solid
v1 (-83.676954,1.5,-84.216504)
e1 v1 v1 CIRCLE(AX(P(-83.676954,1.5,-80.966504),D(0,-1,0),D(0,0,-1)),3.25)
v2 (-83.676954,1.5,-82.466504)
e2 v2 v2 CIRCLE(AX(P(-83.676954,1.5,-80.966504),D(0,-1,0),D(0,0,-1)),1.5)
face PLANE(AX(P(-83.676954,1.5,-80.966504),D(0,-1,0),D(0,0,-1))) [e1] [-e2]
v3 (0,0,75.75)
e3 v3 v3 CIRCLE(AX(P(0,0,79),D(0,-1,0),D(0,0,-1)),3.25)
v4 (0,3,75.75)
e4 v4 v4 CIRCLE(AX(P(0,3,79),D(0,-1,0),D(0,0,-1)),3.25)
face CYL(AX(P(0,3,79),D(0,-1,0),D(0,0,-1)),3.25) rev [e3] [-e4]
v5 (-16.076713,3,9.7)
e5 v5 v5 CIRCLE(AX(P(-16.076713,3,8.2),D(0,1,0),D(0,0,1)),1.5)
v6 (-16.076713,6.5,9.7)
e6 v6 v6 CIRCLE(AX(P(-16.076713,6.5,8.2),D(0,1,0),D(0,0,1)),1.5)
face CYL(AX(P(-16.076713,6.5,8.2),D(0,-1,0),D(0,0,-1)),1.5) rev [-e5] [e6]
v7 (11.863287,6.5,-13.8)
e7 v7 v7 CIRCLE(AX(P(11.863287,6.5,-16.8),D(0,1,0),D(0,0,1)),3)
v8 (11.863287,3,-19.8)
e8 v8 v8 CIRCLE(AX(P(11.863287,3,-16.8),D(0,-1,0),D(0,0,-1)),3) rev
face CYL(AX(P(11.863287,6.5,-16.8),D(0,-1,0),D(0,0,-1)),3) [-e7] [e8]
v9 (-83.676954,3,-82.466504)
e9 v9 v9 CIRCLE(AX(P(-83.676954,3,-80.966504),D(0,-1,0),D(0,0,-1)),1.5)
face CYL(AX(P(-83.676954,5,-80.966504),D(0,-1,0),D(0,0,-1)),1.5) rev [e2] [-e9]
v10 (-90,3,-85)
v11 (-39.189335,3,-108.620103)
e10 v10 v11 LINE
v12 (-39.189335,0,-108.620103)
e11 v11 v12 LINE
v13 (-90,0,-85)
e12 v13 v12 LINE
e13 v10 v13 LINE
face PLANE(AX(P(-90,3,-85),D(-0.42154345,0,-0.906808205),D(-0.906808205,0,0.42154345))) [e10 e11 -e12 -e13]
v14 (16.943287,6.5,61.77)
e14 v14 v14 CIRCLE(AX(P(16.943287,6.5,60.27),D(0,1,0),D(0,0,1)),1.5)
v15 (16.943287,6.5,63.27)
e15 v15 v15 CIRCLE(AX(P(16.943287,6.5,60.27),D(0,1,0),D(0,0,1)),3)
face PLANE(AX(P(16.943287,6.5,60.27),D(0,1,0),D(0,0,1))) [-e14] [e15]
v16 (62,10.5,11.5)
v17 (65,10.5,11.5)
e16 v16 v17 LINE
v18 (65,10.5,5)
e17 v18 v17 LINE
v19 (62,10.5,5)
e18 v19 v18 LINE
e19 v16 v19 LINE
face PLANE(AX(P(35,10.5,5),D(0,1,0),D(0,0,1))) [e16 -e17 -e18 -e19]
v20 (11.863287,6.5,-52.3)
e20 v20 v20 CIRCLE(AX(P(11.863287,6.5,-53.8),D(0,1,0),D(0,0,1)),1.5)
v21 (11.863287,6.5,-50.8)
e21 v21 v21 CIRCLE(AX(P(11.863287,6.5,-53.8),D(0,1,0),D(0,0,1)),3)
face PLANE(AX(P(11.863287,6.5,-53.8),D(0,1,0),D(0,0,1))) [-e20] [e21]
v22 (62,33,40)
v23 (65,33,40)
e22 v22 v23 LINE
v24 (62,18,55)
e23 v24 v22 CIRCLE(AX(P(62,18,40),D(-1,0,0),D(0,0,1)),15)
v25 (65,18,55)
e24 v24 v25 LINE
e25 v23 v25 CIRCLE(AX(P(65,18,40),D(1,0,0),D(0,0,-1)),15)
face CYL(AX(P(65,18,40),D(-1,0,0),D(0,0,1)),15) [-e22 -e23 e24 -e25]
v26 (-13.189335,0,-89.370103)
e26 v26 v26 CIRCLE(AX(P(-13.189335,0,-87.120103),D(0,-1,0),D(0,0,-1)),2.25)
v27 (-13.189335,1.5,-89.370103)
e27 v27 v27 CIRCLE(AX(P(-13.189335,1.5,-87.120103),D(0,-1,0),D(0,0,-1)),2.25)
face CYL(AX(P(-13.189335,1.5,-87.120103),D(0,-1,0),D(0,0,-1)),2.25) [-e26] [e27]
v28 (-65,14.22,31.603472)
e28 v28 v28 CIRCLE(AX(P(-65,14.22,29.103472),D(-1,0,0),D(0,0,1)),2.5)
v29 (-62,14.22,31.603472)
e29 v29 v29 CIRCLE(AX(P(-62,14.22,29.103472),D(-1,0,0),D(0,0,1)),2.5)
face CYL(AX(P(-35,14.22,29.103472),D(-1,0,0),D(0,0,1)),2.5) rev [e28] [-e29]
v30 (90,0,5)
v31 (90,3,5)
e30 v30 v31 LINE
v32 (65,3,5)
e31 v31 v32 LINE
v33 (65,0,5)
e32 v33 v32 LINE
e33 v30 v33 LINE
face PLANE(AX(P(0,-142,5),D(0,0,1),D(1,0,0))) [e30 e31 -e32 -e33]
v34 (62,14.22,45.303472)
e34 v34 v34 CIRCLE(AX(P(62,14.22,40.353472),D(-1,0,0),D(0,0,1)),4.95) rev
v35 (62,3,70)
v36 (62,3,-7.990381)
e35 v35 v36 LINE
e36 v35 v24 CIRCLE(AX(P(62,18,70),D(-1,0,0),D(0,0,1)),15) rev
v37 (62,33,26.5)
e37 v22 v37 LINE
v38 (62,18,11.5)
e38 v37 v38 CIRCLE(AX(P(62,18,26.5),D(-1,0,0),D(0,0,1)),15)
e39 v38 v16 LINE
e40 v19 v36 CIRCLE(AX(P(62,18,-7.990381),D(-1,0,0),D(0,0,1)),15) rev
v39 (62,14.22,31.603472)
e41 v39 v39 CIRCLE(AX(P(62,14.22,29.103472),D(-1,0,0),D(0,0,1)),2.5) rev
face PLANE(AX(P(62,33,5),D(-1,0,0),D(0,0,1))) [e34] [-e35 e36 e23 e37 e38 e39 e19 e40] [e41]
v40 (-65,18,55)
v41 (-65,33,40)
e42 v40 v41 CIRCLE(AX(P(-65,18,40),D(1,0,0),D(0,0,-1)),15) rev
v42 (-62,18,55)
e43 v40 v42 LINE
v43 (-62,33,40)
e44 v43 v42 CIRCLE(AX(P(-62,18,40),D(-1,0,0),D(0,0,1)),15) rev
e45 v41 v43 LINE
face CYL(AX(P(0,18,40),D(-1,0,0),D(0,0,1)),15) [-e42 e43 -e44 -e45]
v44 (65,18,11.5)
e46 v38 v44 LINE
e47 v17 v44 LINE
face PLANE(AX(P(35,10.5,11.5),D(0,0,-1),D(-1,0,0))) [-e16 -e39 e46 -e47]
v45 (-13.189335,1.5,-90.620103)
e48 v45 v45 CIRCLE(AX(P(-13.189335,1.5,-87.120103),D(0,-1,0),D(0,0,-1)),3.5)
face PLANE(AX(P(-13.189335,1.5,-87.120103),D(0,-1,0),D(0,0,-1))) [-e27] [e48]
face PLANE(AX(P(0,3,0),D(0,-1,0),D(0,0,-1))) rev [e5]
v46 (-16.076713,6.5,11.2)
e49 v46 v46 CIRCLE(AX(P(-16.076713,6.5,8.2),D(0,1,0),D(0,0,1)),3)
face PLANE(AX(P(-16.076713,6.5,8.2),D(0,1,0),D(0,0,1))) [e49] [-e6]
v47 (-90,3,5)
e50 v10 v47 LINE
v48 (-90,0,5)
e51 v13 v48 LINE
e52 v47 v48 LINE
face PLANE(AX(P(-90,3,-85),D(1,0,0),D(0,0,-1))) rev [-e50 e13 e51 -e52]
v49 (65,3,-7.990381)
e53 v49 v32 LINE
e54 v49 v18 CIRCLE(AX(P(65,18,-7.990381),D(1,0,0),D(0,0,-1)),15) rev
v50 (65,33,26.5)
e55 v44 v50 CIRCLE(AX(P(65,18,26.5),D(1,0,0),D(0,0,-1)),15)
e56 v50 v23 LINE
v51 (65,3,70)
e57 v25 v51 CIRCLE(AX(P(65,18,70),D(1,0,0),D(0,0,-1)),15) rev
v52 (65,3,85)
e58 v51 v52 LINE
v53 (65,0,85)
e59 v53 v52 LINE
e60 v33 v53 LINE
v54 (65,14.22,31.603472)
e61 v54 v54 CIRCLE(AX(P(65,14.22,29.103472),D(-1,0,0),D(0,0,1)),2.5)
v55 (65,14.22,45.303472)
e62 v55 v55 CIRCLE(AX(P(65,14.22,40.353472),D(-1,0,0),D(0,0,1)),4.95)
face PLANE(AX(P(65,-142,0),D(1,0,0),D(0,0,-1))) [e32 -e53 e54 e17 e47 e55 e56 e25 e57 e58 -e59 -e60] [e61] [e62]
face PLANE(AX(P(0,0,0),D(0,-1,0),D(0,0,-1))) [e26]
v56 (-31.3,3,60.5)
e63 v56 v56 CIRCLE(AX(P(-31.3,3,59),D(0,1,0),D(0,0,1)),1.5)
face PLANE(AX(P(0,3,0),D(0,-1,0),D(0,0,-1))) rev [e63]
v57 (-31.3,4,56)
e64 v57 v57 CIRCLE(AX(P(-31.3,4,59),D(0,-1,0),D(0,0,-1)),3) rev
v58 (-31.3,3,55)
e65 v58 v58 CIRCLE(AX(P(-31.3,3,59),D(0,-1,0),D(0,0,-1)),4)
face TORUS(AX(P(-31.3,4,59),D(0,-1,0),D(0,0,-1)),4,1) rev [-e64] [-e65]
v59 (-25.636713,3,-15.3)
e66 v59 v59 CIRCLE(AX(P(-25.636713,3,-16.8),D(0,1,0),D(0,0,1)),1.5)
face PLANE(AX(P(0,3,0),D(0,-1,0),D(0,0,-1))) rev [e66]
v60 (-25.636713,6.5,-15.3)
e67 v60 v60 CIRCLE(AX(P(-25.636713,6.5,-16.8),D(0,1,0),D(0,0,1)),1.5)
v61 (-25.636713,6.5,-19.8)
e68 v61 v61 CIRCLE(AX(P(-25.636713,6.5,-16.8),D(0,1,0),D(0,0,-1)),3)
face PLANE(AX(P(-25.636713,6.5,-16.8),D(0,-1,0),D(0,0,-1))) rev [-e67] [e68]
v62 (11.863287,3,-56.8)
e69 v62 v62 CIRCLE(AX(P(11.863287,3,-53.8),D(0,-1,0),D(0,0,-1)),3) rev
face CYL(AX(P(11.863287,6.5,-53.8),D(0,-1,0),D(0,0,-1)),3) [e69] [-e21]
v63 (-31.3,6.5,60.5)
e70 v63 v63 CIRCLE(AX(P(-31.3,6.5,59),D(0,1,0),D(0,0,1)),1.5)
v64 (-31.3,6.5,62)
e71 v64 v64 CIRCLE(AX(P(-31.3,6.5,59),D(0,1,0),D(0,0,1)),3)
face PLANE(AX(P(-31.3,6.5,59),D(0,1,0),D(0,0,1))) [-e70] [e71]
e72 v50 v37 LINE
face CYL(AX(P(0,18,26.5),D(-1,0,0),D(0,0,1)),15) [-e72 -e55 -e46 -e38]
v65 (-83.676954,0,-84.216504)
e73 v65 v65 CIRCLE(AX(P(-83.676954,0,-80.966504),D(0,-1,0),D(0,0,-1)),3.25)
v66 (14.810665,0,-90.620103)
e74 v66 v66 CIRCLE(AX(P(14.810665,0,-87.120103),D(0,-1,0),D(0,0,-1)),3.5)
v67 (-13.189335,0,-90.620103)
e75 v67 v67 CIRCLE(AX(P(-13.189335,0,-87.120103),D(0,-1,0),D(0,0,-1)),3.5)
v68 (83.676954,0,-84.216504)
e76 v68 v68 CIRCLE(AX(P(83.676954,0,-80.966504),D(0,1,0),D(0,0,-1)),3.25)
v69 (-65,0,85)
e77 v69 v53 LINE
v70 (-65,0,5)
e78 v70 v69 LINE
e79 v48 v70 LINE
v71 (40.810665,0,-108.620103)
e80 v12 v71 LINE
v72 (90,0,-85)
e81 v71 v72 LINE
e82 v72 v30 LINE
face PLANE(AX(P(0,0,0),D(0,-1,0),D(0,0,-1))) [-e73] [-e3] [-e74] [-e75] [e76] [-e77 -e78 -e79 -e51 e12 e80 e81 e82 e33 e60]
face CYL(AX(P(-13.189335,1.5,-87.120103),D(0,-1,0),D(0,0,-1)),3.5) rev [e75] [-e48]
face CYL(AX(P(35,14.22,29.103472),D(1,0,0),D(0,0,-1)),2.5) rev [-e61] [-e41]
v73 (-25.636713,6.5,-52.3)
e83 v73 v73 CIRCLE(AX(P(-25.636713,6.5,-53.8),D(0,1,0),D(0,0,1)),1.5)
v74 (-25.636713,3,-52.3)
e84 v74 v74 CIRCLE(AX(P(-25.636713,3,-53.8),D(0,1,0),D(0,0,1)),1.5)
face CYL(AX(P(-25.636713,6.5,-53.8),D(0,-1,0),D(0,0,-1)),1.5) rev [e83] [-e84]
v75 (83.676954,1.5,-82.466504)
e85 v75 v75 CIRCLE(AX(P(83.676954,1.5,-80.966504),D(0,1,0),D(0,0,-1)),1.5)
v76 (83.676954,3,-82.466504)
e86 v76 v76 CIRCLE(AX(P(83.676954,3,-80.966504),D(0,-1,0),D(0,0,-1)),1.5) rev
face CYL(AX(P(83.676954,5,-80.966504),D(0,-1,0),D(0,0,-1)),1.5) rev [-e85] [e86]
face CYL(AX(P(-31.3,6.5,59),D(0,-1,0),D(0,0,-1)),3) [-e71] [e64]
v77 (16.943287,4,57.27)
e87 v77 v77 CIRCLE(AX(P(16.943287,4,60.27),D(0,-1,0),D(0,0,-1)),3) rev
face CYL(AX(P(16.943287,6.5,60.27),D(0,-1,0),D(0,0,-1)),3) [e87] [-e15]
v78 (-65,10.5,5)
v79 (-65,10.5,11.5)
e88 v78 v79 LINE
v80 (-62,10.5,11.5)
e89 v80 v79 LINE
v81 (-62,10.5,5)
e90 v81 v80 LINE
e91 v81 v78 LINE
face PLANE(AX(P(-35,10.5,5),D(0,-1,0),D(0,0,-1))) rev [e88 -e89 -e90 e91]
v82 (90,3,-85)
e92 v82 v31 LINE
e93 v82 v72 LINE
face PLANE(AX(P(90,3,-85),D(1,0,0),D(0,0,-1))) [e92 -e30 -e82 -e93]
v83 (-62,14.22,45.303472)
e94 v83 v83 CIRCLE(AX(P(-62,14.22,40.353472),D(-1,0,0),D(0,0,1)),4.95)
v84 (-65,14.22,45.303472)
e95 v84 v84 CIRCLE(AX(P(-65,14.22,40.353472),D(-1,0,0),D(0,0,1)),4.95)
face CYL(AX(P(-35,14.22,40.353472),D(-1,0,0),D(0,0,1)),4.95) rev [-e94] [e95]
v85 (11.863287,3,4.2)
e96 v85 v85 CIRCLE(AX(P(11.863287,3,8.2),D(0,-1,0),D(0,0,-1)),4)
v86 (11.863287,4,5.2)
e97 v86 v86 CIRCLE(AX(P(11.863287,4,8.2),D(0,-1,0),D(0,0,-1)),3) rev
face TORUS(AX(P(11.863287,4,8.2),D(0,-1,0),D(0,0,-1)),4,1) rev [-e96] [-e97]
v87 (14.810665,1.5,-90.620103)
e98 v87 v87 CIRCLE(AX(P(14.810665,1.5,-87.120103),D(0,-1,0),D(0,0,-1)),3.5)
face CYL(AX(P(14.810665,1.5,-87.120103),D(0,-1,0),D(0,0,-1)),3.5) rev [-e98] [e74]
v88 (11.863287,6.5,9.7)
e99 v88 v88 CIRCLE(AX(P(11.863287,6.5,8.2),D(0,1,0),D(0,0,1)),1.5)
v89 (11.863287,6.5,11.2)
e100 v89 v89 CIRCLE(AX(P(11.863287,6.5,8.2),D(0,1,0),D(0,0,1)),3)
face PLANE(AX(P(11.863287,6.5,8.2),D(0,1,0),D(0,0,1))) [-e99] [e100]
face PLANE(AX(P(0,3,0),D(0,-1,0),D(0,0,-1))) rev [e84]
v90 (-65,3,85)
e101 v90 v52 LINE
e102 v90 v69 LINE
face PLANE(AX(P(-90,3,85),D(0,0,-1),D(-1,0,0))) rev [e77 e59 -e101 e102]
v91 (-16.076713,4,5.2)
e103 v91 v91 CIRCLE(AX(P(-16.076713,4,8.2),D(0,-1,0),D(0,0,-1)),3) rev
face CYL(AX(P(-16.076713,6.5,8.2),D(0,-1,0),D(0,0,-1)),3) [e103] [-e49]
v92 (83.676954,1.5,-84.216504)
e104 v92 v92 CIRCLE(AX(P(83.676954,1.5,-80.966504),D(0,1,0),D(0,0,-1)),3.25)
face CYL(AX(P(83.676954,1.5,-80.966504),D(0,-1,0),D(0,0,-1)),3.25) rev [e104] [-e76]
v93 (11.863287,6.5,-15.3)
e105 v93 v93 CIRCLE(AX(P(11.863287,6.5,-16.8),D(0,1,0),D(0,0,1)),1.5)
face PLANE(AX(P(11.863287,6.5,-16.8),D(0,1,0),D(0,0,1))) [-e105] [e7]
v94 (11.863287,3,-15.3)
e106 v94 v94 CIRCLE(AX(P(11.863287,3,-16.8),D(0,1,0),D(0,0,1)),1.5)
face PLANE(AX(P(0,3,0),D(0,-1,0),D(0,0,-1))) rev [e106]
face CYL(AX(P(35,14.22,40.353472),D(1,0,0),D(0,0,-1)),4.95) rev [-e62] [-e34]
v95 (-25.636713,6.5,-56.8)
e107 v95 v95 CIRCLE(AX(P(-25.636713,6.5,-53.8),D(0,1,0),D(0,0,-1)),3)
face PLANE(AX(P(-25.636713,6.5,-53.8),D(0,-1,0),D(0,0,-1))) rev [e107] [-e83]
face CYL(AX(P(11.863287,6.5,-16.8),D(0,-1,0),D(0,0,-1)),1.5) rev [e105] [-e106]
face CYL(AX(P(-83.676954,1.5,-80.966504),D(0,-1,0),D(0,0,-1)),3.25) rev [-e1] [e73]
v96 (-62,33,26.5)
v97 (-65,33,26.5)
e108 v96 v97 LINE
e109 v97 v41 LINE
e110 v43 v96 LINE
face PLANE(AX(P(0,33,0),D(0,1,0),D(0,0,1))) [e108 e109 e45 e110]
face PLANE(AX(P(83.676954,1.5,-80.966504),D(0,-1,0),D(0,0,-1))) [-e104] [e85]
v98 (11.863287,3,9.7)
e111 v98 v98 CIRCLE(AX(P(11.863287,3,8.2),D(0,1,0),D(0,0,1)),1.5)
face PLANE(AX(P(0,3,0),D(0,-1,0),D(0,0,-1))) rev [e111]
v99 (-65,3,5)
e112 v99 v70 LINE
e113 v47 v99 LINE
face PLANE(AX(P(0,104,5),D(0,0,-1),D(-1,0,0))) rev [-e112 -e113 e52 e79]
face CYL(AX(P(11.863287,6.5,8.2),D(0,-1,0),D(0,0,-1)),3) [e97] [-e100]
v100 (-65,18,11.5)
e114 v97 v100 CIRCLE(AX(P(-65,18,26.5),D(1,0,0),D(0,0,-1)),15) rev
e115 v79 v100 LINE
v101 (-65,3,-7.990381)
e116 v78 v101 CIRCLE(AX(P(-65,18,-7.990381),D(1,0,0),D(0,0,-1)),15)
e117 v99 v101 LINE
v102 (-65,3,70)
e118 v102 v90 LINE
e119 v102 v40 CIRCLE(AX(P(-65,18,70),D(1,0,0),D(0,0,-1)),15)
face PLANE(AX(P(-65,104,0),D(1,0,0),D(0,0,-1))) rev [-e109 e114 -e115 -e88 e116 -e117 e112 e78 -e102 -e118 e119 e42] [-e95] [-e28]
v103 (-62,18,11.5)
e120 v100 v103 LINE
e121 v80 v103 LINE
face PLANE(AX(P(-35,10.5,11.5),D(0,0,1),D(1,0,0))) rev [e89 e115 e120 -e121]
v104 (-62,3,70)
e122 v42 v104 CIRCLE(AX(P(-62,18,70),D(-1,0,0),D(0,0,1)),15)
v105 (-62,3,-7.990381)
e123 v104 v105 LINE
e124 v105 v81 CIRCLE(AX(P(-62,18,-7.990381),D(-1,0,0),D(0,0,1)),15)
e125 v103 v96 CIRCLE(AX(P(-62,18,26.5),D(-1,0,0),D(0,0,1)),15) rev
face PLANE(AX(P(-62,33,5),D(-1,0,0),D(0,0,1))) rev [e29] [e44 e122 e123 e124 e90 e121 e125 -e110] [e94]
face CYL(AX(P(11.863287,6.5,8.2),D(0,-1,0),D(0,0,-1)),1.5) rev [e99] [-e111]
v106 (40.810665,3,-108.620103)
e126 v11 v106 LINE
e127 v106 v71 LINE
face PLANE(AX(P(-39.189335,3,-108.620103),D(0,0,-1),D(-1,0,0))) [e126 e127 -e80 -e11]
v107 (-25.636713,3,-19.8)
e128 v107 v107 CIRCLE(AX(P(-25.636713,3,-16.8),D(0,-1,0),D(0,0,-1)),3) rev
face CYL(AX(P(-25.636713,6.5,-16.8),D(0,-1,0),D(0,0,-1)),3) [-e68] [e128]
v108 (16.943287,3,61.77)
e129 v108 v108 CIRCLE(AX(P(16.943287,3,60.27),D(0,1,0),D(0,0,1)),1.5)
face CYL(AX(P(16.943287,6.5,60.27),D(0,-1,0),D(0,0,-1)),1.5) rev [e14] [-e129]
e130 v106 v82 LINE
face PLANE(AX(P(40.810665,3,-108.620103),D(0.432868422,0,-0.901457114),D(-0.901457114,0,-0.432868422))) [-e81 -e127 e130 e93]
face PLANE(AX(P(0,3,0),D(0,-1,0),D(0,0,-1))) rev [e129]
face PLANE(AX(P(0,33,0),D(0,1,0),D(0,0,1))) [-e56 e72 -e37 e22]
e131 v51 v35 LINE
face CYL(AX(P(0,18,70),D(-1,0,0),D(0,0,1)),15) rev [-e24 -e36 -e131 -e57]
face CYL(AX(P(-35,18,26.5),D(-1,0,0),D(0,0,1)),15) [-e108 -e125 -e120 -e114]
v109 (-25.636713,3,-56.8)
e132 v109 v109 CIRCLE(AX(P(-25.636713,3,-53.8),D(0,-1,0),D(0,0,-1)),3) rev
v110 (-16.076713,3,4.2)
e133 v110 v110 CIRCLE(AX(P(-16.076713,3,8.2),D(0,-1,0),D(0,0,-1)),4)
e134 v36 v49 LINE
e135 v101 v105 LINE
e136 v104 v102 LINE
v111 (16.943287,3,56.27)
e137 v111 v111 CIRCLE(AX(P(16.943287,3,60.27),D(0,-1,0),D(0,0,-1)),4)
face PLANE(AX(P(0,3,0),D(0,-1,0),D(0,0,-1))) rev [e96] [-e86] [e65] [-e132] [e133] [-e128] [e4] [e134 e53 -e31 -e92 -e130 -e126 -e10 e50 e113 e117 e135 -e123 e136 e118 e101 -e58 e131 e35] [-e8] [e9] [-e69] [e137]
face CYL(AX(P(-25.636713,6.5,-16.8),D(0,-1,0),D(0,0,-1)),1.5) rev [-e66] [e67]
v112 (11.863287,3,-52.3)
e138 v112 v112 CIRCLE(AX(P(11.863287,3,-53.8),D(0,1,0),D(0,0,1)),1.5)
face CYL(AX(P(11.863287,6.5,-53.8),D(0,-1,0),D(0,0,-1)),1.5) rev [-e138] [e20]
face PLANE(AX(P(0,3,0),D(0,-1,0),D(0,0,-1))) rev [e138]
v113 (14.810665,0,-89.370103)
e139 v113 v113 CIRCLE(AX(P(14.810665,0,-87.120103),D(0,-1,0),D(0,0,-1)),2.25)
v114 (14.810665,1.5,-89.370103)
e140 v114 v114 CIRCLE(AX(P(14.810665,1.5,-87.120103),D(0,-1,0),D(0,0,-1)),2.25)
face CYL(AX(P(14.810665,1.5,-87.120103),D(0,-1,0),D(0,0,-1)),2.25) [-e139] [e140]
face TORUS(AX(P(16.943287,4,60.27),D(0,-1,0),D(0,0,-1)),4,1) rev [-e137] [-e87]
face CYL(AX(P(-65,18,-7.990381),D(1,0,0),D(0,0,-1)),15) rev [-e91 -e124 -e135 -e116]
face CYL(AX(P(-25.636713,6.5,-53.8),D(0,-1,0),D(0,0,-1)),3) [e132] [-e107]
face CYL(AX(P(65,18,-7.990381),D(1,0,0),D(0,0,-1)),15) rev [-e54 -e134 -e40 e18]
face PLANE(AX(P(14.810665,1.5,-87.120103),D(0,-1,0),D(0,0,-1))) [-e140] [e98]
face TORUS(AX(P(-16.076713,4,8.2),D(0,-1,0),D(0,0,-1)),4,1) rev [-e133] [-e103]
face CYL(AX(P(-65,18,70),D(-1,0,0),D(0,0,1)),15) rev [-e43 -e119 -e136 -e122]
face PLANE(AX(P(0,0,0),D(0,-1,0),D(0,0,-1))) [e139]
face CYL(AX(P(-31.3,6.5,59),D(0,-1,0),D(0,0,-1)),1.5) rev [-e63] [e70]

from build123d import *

# Parameters (mm, degrees)
SALIENTE_EXTRUIR1_DEPTH    = 3
CORTAR_EXTRUIR5_DEPTH      = 104
CORTAR_EXTRUIR5_DEPTH_BACK = 142
CROQUIS1_5_W               = 25
CROQUIS1_5_H               = 80
CROQUIS2_W                 = 3
CROQUIS2_H                 = 50
SALIENTE_EXTRUIR2_DEPTH    = 30
CROQUIS3_R                 = 4.95
CROQUIS3_R_2               = 2.5
CROQUIS3_W                 = 6.5
CROQUIS3_H                 = 22.5
CORTAR_EXTRUIR6_DEPTH      = 30
CROQUIS4_R                 = 3.25
CORTAR_EXTRUIR7_DEPTH      = 1.5
CROQUIS5_R                 = 3.25
CORTAR_EXTRUIR8_DEPTH      = 3
REDONDEO11_R               = 15
REDONDEO12_START           = -65
REDONDEO12_DEPTH           = 130
REDONDEO12_2_DEPTH         = 3
REDONDEO12_START_2         = 62
REDONDEO12_3_DEPTH         = 3
REDONDEO13_R               = 15
CROQUIS7_R                 = 3
CROQUIS7_R_2               = 1.5
SALIENTE_EXTRUIR4_DEPTH    = 3.5
REDONDEO14_R               = 1
CROQUIS10_R                = 1.5
CORTAR_EXTRUIR11_DEPTH     = 3.5
CROQUIS6_R                 = 3.5
CROQUIS6_R_2               = 2.25
CORTAR_EXTRUIR12_DEPTH     = 1.5


with BuildPart() as part:
    # Croquis1 → Saliente-Extruir1 (new body)
    with BuildSketch(Plane(origin=(0, 0, 0), x_dir=(1, 0, 0), z_dir=(0, 1, 0))):
        Polygon((-90, 85), (-90, -85), (90, -85), (90, 85), (40.810665128, 108.620102865), (-39.189334872, 108.620102865), align=None)
    extrude(amount=SALIENTE_EXTRUIR1_DEPTH)

    # Croquis1<5> → Cortar-Extruir5 (cut, two sides: drawn at the far end of the back side and taken through both)
    with BuildSketch(Plane(origin=(0, 0, 0), x_dir=(1, 0, 0), z_dir=(0, 1, 0)).offset(-CORTAR_EXTRUIR5_DEPTH_BACK)):
        with Locations((-77.5, -45)):
            Rectangle(CROQUIS1_5_W, CROQUIS1_5_H)
        with Locations((77.5, -45)):
            Rectangle(CROQUIS1_5_W, CROQUIS1_5_H)
    extrude(amount=CORTAR_EXTRUIR5_DEPTH + CORTAR_EXTRUIR5_DEPTH_BACK, mode=Mode.SUBTRACT)

    # Croquis2 → Saliente-Extruir2 (add)
    with BuildSketch(Plane(origin=(0, 3, 0), x_dir=(1, 0, 0), z_dir=(0, 1, 0))):
        with Locations((-63.5, -30)):
            Rectangle(CROQUIS2_W, CROQUIS2_H)
    saliente_extruir2 = extrude(amount=SALIENTE_EXTRUIR2_DEPTH)

    # Croquis3 → Cortar-Extruir6 (cut)
    with BuildSketch(Plane.ZY.offset(65)):
        with Locations((40.353471705, 14.22)):
            Circle(CROQUIS3_R)
        with Locations((29.103471705, 14.22)):
            Circle(CROQUIS3_R_2)
        with Locations((8.25, 21.75)):
            Rectangle(CROQUIS3_W, CROQUIS3_H)
    cortar_extruir6 = extrude(amount=-CORTAR_EXTRUIR6_DEPTH, mode=Mode.SUBTRACT)

    # Simetría2: Saliente-Extruir2 across plane
    add(saliente_extruir2.mirror(Plane(origin=(0, 0, 0), x_dir=(0, 0, 1), z_dir=(1, 0, 0))))

    # Simetría3: Cortar-Extruir6 across plane
    add(cortar_extruir6.mirror(Plane(origin=(0, 0, 0), x_dir=(0, 0, 1), z_dir=(1, 0, 0))), mode=Mode.SUBTRACT)

    # Croquis4 → Cortar-Extruir7 (cut)
    with BuildSketch(Plane.XZ):
        with Locations(Location((-83.676954094, -80.966503939, 0), (0, 0, 270))):
            Circle(CROQUIS4_R)
    cortar_extruir7 = extrude(amount=-CORTAR_EXTRUIR7_DEPTH, mode=Mode.SUBTRACT)

    # Simetría4: Cortar-Extruir7 across plane
    add(cortar_extruir7.mirror(Plane(origin=(0, 0, 0), x_dir=(0, 0, 1), z_dir=(1, 0, 0))), mode=Mode.SUBTRACT)

    # Croquis5 → Cortar-Extruir8 (cut)
    with BuildSketch(Plane(origin=(0, 0, 0), x_dir=(-1, 0, 0), z_dir=(0, -1, 0))):
        with Locations(Location((0, -79, 0), (0, 0, 90))):
            Circle(CROQUIS5_R)
    extrude(amount=-CORTAR_EXTRUIR8_DEPTH, mode=Mode.SUBTRACT)

    # Redondeo11
    # the kernel refuses this fillet: 15 mm, written as the material it adds along each edge
    with BuildSketch(Plane(origin=(-65, 3, 5), x_dir=(0, 0, -1), z_dir=(1, 0, 0))) as redondeo11_piece_1:
        with BuildLine():
            CenterArc((12.990381057, 15), REDONDEO11_R, 210, 60)
            Line((0, 7.5), (0, 0))
            Line((0, 0), (12.990381057, 0))
        make_face()
    extrude(amount=3)
    with BuildSketch(Plane(origin=(65, 3, 5), x_dir=(0, 0, -1), z_dir=(-1, 0, 0))) as redondeo11_piece_2:
        with BuildLine():
            CenterArc((12.990381057, -15), REDONDEO11_R, 90, 60)
            Line((0, -7.5), (0, 0))
            Line((0, 0), (12.990381057, 0))
        make_face()
    extrude(amount=3)

    # Redondeo12: read off the stored shape, not the designer's step
    # Redondeo12 outline → Redondeo12 (cut)
    with BuildSketch(Plane.YZ.offset(REDONDEO12_START)):
        with BuildLine():
            Line((33, 55), (18, 55))
            ThreePointArc((18, 55), (28.606601718, 50.606601718), (33, 40))
            Line((33, 40), (33, 55))
        make_face()
    extrude(amount=REDONDEO12_DEPTH, mode=Mode.SUBTRACT)

    # Redondeo12 2 outline → Redondeo12 2 (add)
    with BuildSketch(Plane.YZ.offset(REDONDEO12_START)):
        with BuildLine():
            Line((3, 55), (18, 55))
            ThreePointArc((18, 55), (7.393398282, 59.393398282), (3, 70))
            Line((3, 70), (3, 55))
        make_face()
    extrude(amount=REDONDEO12_2_DEPTH)

    # Redondeo12 3 outline → Redondeo12 3 (add)
    with BuildSketch(Plane.YZ.offset(REDONDEO12_START_2)):
        with BuildLine():
            Line((3, 55), (18, 55))
            ThreePointArc((18, 55), (7.393398282, 59.393398282), (3, 70))
            Line((3, 70), (3, 55))
        make_face()
    extrude(amount=REDONDEO12_3_DEPTH)

    # Redondeo13
    redondeo13_edges = [part.edges().sort_by_distance(p)[0] for p in [
        (63.5, 33, 11.5),
        (-63.5, 33, 11.5),
    ]]
    fillet(redondeo13_edges, radius=REDONDEO13_R)

    # Croquis7 → Saliente-Extruir4 (add)
    # profile 1 of 8: a face of its own
    with BuildSketch(Plane(origin=(0, 3, 0), x_dir=(1, 0, 0), z_dir=(0, 1, 0))):
        with Locations(Location((-31.3, -59, 0), (0, 0, 90))):
            Circle(CROQUIS7_R)
        with Locations(Location((-31.3, -59, 0), (0, 0, 270))):
            Circle(CROQUIS7_R_2, mode=Mode.SUBTRACT)
    # profile 2 of 8: a face of its own
    with BuildSketch(Plane(origin=(0, 3, 0), x_dir=(1, 0, 0), z_dir=(0, 1, 0))):
        with Locations(Location((16.94328658, -60.27, 0), (0, 0, 90))):
            Circle(CROQUIS7_R)
        with Locations(Location((16.94328658, -60.27, 0), (0, 0, 270))):
            Circle(CROQUIS7_R_2, mode=Mode.SUBTRACT)
    # profile 3 of 8: a face of its own
    with BuildSketch(Plane(origin=(0, 3, 0), x_dir=(1, 0, 0), z_dir=(0, 1, 0))):
        with Locations(Location((11.86328658, -8.2, 0), (0, 0, 90))):
            Circle(CROQUIS7_R)
        with Locations(Location((11.86328658, -8.2, 0), (0, 0, 270))):
            Circle(CROQUIS7_R_2, mode=Mode.SUBTRACT)
    # profile 4 of 8: a face of its own
    with BuildSketch(Plane(origin=(0, 3, 0), x_dir=(1, 0, 0), z_dir=(0, 1, 0))):
        with Locations(Location((-16.07671342, -8.2, 0), (0, 0, 90))):
            Circle(CROQUIS7_R)
        with Locations(Location((-16.07671342, -8.2, 0), (0, 0, 270))):
            Circle(CROQUIS7_R_2, mode=Mode.SUBTRACT)
    # profile 5 of 8: a face of its own
    with BuildSketch(Plane(origin=(0, 3, 0), x_dir=(1, 0, 0), z_dir=(0, 1, 0))):
        with Locations(Location((11.86328658, 16.8, 0), (0, 0, 90))):
            Circle(CROQUIS7_R)
        with Locations(Location((11.86328658, 16.8, 0), (0, 0, 270))):
            Circle(CROQUIS7_R_2, mode=Mode.SUBTRACT)
    # profile 6 of 8: a face of its own
    with BuildSketch(Plane(origin=(0, 3, 0), x_dir=(1, 0, 0), z_dir=(0, 1, 0))):
        with Locations(Location((11.86328658, 53.8, 0), (0, 0, 90))):
            Circle(CROQUIS7_R)
        with Locations(Location((11.86328658, 53.8, 0), (0, 0, 270))):
            Circle(CROQUIS7_R_2, mode=Mode.SUBTRACT)
    # profile 7 of 8: a face of its own
    with BuildSketch(Plane(origin=(0, 3, 0), x_dir=(1, 0, 0), z_dir=(0, 1, 0))):
        with Locations(Location((-25.63671342, 16.8, 0), (0, 0, 90))):
            Circle(CROQUIS7_R)
        with Locations(Location((-25.63671342, 16.8, 0), (0, 0, 270))):
            Circle(CROQUIS7_R_2, mode=Mode.SUBTRACT)
    # profile 8 of 8: a face of its own
    with BuildSketch(Plane(origin=(0, 3, 0), x_dir=(1, 0, 0), z_dir=(0, 1, 0))):
        with Locations(Location((-25.63671342, 53.8, 0), (0, 0, 90))):
            Circle(CROQUIS7_R)
        with Locations(Location((-25.63671342, 53.8, 0), (0, 0, 270))):
            Circle(CROQUIS7_R_2, mode=Mode.SUBTRACT)
    extrude(amount=SALIENTE_EXTRUIR4_DEPTH)

    # Redondeo14
    redondeo14_edges = [part.edges().sort_by_distance(p)[0] for p in [
        (-31.3, 3, 62),
        (16.94328658, 3, 63.27),
        (11.86328658, 3, 11.2),
        (-16.07671342, 3, 11.2),
    ]]
    fillet(redondeo14_edges, radius=REDONDEO14_R)

    # Croquis10 → Cortar-Extruir11 (cut)
    with BuildSketch(Plane.XZ.offset(-1.5)):
        with Locations(Location((-83.676954094, -80.966503939, 0), (0, 0, 270))):
            Circle(CROQUIS10_R)
    cortar_extruir11 = extrude(amount=-CORTAR_EXTRUIR11_DEPTH, mode=Mode.SUBTRACT)

    # Simetría5: Cortar-Extruir11 across plane
    add(cortar_extruir11.mirror(Plane(origin=(0, 0, 0), x_dir=(0, 0, 1), z_dir=(1, 0, 0))), mode=Mode.SUBTRACT)

    # Croquis6 → Cortar-Extruir12 (cut)
    # profile 1 of 2: a face of its own
    with BuildSketch(Plane.XZ):
        with Locations(Location((-13.189334872, -87.120102865, 0), (0, 0, 270))):
            Circle(CROQUIS6_R)
        with Locations(Location((-13.189334872, -87.120102865, 0), (0, 0, 270))):
            Circle(CROQUIS6_R_2, mode=Mode.SUBTRACT)
    # profile 2 of 2: a face of its own
    with BuildSketch(Plane.XZ):
        with Locations(Location((14.810665128, -87.120102865, 0), (0, 0, 270))):
            Circle(CROQUIS6_R)
        with Locations(Location((14.810665128, -87.120102865, 0), (0, 0, 270))):
            Circle(CROQUIS6_R_2, mode=Mode.SUBTRACT)
    extrude(amount=-CORTAR_EXTRUIR12_DEPTH, mode=Mode.SUBTRACT)


solid = part.part
